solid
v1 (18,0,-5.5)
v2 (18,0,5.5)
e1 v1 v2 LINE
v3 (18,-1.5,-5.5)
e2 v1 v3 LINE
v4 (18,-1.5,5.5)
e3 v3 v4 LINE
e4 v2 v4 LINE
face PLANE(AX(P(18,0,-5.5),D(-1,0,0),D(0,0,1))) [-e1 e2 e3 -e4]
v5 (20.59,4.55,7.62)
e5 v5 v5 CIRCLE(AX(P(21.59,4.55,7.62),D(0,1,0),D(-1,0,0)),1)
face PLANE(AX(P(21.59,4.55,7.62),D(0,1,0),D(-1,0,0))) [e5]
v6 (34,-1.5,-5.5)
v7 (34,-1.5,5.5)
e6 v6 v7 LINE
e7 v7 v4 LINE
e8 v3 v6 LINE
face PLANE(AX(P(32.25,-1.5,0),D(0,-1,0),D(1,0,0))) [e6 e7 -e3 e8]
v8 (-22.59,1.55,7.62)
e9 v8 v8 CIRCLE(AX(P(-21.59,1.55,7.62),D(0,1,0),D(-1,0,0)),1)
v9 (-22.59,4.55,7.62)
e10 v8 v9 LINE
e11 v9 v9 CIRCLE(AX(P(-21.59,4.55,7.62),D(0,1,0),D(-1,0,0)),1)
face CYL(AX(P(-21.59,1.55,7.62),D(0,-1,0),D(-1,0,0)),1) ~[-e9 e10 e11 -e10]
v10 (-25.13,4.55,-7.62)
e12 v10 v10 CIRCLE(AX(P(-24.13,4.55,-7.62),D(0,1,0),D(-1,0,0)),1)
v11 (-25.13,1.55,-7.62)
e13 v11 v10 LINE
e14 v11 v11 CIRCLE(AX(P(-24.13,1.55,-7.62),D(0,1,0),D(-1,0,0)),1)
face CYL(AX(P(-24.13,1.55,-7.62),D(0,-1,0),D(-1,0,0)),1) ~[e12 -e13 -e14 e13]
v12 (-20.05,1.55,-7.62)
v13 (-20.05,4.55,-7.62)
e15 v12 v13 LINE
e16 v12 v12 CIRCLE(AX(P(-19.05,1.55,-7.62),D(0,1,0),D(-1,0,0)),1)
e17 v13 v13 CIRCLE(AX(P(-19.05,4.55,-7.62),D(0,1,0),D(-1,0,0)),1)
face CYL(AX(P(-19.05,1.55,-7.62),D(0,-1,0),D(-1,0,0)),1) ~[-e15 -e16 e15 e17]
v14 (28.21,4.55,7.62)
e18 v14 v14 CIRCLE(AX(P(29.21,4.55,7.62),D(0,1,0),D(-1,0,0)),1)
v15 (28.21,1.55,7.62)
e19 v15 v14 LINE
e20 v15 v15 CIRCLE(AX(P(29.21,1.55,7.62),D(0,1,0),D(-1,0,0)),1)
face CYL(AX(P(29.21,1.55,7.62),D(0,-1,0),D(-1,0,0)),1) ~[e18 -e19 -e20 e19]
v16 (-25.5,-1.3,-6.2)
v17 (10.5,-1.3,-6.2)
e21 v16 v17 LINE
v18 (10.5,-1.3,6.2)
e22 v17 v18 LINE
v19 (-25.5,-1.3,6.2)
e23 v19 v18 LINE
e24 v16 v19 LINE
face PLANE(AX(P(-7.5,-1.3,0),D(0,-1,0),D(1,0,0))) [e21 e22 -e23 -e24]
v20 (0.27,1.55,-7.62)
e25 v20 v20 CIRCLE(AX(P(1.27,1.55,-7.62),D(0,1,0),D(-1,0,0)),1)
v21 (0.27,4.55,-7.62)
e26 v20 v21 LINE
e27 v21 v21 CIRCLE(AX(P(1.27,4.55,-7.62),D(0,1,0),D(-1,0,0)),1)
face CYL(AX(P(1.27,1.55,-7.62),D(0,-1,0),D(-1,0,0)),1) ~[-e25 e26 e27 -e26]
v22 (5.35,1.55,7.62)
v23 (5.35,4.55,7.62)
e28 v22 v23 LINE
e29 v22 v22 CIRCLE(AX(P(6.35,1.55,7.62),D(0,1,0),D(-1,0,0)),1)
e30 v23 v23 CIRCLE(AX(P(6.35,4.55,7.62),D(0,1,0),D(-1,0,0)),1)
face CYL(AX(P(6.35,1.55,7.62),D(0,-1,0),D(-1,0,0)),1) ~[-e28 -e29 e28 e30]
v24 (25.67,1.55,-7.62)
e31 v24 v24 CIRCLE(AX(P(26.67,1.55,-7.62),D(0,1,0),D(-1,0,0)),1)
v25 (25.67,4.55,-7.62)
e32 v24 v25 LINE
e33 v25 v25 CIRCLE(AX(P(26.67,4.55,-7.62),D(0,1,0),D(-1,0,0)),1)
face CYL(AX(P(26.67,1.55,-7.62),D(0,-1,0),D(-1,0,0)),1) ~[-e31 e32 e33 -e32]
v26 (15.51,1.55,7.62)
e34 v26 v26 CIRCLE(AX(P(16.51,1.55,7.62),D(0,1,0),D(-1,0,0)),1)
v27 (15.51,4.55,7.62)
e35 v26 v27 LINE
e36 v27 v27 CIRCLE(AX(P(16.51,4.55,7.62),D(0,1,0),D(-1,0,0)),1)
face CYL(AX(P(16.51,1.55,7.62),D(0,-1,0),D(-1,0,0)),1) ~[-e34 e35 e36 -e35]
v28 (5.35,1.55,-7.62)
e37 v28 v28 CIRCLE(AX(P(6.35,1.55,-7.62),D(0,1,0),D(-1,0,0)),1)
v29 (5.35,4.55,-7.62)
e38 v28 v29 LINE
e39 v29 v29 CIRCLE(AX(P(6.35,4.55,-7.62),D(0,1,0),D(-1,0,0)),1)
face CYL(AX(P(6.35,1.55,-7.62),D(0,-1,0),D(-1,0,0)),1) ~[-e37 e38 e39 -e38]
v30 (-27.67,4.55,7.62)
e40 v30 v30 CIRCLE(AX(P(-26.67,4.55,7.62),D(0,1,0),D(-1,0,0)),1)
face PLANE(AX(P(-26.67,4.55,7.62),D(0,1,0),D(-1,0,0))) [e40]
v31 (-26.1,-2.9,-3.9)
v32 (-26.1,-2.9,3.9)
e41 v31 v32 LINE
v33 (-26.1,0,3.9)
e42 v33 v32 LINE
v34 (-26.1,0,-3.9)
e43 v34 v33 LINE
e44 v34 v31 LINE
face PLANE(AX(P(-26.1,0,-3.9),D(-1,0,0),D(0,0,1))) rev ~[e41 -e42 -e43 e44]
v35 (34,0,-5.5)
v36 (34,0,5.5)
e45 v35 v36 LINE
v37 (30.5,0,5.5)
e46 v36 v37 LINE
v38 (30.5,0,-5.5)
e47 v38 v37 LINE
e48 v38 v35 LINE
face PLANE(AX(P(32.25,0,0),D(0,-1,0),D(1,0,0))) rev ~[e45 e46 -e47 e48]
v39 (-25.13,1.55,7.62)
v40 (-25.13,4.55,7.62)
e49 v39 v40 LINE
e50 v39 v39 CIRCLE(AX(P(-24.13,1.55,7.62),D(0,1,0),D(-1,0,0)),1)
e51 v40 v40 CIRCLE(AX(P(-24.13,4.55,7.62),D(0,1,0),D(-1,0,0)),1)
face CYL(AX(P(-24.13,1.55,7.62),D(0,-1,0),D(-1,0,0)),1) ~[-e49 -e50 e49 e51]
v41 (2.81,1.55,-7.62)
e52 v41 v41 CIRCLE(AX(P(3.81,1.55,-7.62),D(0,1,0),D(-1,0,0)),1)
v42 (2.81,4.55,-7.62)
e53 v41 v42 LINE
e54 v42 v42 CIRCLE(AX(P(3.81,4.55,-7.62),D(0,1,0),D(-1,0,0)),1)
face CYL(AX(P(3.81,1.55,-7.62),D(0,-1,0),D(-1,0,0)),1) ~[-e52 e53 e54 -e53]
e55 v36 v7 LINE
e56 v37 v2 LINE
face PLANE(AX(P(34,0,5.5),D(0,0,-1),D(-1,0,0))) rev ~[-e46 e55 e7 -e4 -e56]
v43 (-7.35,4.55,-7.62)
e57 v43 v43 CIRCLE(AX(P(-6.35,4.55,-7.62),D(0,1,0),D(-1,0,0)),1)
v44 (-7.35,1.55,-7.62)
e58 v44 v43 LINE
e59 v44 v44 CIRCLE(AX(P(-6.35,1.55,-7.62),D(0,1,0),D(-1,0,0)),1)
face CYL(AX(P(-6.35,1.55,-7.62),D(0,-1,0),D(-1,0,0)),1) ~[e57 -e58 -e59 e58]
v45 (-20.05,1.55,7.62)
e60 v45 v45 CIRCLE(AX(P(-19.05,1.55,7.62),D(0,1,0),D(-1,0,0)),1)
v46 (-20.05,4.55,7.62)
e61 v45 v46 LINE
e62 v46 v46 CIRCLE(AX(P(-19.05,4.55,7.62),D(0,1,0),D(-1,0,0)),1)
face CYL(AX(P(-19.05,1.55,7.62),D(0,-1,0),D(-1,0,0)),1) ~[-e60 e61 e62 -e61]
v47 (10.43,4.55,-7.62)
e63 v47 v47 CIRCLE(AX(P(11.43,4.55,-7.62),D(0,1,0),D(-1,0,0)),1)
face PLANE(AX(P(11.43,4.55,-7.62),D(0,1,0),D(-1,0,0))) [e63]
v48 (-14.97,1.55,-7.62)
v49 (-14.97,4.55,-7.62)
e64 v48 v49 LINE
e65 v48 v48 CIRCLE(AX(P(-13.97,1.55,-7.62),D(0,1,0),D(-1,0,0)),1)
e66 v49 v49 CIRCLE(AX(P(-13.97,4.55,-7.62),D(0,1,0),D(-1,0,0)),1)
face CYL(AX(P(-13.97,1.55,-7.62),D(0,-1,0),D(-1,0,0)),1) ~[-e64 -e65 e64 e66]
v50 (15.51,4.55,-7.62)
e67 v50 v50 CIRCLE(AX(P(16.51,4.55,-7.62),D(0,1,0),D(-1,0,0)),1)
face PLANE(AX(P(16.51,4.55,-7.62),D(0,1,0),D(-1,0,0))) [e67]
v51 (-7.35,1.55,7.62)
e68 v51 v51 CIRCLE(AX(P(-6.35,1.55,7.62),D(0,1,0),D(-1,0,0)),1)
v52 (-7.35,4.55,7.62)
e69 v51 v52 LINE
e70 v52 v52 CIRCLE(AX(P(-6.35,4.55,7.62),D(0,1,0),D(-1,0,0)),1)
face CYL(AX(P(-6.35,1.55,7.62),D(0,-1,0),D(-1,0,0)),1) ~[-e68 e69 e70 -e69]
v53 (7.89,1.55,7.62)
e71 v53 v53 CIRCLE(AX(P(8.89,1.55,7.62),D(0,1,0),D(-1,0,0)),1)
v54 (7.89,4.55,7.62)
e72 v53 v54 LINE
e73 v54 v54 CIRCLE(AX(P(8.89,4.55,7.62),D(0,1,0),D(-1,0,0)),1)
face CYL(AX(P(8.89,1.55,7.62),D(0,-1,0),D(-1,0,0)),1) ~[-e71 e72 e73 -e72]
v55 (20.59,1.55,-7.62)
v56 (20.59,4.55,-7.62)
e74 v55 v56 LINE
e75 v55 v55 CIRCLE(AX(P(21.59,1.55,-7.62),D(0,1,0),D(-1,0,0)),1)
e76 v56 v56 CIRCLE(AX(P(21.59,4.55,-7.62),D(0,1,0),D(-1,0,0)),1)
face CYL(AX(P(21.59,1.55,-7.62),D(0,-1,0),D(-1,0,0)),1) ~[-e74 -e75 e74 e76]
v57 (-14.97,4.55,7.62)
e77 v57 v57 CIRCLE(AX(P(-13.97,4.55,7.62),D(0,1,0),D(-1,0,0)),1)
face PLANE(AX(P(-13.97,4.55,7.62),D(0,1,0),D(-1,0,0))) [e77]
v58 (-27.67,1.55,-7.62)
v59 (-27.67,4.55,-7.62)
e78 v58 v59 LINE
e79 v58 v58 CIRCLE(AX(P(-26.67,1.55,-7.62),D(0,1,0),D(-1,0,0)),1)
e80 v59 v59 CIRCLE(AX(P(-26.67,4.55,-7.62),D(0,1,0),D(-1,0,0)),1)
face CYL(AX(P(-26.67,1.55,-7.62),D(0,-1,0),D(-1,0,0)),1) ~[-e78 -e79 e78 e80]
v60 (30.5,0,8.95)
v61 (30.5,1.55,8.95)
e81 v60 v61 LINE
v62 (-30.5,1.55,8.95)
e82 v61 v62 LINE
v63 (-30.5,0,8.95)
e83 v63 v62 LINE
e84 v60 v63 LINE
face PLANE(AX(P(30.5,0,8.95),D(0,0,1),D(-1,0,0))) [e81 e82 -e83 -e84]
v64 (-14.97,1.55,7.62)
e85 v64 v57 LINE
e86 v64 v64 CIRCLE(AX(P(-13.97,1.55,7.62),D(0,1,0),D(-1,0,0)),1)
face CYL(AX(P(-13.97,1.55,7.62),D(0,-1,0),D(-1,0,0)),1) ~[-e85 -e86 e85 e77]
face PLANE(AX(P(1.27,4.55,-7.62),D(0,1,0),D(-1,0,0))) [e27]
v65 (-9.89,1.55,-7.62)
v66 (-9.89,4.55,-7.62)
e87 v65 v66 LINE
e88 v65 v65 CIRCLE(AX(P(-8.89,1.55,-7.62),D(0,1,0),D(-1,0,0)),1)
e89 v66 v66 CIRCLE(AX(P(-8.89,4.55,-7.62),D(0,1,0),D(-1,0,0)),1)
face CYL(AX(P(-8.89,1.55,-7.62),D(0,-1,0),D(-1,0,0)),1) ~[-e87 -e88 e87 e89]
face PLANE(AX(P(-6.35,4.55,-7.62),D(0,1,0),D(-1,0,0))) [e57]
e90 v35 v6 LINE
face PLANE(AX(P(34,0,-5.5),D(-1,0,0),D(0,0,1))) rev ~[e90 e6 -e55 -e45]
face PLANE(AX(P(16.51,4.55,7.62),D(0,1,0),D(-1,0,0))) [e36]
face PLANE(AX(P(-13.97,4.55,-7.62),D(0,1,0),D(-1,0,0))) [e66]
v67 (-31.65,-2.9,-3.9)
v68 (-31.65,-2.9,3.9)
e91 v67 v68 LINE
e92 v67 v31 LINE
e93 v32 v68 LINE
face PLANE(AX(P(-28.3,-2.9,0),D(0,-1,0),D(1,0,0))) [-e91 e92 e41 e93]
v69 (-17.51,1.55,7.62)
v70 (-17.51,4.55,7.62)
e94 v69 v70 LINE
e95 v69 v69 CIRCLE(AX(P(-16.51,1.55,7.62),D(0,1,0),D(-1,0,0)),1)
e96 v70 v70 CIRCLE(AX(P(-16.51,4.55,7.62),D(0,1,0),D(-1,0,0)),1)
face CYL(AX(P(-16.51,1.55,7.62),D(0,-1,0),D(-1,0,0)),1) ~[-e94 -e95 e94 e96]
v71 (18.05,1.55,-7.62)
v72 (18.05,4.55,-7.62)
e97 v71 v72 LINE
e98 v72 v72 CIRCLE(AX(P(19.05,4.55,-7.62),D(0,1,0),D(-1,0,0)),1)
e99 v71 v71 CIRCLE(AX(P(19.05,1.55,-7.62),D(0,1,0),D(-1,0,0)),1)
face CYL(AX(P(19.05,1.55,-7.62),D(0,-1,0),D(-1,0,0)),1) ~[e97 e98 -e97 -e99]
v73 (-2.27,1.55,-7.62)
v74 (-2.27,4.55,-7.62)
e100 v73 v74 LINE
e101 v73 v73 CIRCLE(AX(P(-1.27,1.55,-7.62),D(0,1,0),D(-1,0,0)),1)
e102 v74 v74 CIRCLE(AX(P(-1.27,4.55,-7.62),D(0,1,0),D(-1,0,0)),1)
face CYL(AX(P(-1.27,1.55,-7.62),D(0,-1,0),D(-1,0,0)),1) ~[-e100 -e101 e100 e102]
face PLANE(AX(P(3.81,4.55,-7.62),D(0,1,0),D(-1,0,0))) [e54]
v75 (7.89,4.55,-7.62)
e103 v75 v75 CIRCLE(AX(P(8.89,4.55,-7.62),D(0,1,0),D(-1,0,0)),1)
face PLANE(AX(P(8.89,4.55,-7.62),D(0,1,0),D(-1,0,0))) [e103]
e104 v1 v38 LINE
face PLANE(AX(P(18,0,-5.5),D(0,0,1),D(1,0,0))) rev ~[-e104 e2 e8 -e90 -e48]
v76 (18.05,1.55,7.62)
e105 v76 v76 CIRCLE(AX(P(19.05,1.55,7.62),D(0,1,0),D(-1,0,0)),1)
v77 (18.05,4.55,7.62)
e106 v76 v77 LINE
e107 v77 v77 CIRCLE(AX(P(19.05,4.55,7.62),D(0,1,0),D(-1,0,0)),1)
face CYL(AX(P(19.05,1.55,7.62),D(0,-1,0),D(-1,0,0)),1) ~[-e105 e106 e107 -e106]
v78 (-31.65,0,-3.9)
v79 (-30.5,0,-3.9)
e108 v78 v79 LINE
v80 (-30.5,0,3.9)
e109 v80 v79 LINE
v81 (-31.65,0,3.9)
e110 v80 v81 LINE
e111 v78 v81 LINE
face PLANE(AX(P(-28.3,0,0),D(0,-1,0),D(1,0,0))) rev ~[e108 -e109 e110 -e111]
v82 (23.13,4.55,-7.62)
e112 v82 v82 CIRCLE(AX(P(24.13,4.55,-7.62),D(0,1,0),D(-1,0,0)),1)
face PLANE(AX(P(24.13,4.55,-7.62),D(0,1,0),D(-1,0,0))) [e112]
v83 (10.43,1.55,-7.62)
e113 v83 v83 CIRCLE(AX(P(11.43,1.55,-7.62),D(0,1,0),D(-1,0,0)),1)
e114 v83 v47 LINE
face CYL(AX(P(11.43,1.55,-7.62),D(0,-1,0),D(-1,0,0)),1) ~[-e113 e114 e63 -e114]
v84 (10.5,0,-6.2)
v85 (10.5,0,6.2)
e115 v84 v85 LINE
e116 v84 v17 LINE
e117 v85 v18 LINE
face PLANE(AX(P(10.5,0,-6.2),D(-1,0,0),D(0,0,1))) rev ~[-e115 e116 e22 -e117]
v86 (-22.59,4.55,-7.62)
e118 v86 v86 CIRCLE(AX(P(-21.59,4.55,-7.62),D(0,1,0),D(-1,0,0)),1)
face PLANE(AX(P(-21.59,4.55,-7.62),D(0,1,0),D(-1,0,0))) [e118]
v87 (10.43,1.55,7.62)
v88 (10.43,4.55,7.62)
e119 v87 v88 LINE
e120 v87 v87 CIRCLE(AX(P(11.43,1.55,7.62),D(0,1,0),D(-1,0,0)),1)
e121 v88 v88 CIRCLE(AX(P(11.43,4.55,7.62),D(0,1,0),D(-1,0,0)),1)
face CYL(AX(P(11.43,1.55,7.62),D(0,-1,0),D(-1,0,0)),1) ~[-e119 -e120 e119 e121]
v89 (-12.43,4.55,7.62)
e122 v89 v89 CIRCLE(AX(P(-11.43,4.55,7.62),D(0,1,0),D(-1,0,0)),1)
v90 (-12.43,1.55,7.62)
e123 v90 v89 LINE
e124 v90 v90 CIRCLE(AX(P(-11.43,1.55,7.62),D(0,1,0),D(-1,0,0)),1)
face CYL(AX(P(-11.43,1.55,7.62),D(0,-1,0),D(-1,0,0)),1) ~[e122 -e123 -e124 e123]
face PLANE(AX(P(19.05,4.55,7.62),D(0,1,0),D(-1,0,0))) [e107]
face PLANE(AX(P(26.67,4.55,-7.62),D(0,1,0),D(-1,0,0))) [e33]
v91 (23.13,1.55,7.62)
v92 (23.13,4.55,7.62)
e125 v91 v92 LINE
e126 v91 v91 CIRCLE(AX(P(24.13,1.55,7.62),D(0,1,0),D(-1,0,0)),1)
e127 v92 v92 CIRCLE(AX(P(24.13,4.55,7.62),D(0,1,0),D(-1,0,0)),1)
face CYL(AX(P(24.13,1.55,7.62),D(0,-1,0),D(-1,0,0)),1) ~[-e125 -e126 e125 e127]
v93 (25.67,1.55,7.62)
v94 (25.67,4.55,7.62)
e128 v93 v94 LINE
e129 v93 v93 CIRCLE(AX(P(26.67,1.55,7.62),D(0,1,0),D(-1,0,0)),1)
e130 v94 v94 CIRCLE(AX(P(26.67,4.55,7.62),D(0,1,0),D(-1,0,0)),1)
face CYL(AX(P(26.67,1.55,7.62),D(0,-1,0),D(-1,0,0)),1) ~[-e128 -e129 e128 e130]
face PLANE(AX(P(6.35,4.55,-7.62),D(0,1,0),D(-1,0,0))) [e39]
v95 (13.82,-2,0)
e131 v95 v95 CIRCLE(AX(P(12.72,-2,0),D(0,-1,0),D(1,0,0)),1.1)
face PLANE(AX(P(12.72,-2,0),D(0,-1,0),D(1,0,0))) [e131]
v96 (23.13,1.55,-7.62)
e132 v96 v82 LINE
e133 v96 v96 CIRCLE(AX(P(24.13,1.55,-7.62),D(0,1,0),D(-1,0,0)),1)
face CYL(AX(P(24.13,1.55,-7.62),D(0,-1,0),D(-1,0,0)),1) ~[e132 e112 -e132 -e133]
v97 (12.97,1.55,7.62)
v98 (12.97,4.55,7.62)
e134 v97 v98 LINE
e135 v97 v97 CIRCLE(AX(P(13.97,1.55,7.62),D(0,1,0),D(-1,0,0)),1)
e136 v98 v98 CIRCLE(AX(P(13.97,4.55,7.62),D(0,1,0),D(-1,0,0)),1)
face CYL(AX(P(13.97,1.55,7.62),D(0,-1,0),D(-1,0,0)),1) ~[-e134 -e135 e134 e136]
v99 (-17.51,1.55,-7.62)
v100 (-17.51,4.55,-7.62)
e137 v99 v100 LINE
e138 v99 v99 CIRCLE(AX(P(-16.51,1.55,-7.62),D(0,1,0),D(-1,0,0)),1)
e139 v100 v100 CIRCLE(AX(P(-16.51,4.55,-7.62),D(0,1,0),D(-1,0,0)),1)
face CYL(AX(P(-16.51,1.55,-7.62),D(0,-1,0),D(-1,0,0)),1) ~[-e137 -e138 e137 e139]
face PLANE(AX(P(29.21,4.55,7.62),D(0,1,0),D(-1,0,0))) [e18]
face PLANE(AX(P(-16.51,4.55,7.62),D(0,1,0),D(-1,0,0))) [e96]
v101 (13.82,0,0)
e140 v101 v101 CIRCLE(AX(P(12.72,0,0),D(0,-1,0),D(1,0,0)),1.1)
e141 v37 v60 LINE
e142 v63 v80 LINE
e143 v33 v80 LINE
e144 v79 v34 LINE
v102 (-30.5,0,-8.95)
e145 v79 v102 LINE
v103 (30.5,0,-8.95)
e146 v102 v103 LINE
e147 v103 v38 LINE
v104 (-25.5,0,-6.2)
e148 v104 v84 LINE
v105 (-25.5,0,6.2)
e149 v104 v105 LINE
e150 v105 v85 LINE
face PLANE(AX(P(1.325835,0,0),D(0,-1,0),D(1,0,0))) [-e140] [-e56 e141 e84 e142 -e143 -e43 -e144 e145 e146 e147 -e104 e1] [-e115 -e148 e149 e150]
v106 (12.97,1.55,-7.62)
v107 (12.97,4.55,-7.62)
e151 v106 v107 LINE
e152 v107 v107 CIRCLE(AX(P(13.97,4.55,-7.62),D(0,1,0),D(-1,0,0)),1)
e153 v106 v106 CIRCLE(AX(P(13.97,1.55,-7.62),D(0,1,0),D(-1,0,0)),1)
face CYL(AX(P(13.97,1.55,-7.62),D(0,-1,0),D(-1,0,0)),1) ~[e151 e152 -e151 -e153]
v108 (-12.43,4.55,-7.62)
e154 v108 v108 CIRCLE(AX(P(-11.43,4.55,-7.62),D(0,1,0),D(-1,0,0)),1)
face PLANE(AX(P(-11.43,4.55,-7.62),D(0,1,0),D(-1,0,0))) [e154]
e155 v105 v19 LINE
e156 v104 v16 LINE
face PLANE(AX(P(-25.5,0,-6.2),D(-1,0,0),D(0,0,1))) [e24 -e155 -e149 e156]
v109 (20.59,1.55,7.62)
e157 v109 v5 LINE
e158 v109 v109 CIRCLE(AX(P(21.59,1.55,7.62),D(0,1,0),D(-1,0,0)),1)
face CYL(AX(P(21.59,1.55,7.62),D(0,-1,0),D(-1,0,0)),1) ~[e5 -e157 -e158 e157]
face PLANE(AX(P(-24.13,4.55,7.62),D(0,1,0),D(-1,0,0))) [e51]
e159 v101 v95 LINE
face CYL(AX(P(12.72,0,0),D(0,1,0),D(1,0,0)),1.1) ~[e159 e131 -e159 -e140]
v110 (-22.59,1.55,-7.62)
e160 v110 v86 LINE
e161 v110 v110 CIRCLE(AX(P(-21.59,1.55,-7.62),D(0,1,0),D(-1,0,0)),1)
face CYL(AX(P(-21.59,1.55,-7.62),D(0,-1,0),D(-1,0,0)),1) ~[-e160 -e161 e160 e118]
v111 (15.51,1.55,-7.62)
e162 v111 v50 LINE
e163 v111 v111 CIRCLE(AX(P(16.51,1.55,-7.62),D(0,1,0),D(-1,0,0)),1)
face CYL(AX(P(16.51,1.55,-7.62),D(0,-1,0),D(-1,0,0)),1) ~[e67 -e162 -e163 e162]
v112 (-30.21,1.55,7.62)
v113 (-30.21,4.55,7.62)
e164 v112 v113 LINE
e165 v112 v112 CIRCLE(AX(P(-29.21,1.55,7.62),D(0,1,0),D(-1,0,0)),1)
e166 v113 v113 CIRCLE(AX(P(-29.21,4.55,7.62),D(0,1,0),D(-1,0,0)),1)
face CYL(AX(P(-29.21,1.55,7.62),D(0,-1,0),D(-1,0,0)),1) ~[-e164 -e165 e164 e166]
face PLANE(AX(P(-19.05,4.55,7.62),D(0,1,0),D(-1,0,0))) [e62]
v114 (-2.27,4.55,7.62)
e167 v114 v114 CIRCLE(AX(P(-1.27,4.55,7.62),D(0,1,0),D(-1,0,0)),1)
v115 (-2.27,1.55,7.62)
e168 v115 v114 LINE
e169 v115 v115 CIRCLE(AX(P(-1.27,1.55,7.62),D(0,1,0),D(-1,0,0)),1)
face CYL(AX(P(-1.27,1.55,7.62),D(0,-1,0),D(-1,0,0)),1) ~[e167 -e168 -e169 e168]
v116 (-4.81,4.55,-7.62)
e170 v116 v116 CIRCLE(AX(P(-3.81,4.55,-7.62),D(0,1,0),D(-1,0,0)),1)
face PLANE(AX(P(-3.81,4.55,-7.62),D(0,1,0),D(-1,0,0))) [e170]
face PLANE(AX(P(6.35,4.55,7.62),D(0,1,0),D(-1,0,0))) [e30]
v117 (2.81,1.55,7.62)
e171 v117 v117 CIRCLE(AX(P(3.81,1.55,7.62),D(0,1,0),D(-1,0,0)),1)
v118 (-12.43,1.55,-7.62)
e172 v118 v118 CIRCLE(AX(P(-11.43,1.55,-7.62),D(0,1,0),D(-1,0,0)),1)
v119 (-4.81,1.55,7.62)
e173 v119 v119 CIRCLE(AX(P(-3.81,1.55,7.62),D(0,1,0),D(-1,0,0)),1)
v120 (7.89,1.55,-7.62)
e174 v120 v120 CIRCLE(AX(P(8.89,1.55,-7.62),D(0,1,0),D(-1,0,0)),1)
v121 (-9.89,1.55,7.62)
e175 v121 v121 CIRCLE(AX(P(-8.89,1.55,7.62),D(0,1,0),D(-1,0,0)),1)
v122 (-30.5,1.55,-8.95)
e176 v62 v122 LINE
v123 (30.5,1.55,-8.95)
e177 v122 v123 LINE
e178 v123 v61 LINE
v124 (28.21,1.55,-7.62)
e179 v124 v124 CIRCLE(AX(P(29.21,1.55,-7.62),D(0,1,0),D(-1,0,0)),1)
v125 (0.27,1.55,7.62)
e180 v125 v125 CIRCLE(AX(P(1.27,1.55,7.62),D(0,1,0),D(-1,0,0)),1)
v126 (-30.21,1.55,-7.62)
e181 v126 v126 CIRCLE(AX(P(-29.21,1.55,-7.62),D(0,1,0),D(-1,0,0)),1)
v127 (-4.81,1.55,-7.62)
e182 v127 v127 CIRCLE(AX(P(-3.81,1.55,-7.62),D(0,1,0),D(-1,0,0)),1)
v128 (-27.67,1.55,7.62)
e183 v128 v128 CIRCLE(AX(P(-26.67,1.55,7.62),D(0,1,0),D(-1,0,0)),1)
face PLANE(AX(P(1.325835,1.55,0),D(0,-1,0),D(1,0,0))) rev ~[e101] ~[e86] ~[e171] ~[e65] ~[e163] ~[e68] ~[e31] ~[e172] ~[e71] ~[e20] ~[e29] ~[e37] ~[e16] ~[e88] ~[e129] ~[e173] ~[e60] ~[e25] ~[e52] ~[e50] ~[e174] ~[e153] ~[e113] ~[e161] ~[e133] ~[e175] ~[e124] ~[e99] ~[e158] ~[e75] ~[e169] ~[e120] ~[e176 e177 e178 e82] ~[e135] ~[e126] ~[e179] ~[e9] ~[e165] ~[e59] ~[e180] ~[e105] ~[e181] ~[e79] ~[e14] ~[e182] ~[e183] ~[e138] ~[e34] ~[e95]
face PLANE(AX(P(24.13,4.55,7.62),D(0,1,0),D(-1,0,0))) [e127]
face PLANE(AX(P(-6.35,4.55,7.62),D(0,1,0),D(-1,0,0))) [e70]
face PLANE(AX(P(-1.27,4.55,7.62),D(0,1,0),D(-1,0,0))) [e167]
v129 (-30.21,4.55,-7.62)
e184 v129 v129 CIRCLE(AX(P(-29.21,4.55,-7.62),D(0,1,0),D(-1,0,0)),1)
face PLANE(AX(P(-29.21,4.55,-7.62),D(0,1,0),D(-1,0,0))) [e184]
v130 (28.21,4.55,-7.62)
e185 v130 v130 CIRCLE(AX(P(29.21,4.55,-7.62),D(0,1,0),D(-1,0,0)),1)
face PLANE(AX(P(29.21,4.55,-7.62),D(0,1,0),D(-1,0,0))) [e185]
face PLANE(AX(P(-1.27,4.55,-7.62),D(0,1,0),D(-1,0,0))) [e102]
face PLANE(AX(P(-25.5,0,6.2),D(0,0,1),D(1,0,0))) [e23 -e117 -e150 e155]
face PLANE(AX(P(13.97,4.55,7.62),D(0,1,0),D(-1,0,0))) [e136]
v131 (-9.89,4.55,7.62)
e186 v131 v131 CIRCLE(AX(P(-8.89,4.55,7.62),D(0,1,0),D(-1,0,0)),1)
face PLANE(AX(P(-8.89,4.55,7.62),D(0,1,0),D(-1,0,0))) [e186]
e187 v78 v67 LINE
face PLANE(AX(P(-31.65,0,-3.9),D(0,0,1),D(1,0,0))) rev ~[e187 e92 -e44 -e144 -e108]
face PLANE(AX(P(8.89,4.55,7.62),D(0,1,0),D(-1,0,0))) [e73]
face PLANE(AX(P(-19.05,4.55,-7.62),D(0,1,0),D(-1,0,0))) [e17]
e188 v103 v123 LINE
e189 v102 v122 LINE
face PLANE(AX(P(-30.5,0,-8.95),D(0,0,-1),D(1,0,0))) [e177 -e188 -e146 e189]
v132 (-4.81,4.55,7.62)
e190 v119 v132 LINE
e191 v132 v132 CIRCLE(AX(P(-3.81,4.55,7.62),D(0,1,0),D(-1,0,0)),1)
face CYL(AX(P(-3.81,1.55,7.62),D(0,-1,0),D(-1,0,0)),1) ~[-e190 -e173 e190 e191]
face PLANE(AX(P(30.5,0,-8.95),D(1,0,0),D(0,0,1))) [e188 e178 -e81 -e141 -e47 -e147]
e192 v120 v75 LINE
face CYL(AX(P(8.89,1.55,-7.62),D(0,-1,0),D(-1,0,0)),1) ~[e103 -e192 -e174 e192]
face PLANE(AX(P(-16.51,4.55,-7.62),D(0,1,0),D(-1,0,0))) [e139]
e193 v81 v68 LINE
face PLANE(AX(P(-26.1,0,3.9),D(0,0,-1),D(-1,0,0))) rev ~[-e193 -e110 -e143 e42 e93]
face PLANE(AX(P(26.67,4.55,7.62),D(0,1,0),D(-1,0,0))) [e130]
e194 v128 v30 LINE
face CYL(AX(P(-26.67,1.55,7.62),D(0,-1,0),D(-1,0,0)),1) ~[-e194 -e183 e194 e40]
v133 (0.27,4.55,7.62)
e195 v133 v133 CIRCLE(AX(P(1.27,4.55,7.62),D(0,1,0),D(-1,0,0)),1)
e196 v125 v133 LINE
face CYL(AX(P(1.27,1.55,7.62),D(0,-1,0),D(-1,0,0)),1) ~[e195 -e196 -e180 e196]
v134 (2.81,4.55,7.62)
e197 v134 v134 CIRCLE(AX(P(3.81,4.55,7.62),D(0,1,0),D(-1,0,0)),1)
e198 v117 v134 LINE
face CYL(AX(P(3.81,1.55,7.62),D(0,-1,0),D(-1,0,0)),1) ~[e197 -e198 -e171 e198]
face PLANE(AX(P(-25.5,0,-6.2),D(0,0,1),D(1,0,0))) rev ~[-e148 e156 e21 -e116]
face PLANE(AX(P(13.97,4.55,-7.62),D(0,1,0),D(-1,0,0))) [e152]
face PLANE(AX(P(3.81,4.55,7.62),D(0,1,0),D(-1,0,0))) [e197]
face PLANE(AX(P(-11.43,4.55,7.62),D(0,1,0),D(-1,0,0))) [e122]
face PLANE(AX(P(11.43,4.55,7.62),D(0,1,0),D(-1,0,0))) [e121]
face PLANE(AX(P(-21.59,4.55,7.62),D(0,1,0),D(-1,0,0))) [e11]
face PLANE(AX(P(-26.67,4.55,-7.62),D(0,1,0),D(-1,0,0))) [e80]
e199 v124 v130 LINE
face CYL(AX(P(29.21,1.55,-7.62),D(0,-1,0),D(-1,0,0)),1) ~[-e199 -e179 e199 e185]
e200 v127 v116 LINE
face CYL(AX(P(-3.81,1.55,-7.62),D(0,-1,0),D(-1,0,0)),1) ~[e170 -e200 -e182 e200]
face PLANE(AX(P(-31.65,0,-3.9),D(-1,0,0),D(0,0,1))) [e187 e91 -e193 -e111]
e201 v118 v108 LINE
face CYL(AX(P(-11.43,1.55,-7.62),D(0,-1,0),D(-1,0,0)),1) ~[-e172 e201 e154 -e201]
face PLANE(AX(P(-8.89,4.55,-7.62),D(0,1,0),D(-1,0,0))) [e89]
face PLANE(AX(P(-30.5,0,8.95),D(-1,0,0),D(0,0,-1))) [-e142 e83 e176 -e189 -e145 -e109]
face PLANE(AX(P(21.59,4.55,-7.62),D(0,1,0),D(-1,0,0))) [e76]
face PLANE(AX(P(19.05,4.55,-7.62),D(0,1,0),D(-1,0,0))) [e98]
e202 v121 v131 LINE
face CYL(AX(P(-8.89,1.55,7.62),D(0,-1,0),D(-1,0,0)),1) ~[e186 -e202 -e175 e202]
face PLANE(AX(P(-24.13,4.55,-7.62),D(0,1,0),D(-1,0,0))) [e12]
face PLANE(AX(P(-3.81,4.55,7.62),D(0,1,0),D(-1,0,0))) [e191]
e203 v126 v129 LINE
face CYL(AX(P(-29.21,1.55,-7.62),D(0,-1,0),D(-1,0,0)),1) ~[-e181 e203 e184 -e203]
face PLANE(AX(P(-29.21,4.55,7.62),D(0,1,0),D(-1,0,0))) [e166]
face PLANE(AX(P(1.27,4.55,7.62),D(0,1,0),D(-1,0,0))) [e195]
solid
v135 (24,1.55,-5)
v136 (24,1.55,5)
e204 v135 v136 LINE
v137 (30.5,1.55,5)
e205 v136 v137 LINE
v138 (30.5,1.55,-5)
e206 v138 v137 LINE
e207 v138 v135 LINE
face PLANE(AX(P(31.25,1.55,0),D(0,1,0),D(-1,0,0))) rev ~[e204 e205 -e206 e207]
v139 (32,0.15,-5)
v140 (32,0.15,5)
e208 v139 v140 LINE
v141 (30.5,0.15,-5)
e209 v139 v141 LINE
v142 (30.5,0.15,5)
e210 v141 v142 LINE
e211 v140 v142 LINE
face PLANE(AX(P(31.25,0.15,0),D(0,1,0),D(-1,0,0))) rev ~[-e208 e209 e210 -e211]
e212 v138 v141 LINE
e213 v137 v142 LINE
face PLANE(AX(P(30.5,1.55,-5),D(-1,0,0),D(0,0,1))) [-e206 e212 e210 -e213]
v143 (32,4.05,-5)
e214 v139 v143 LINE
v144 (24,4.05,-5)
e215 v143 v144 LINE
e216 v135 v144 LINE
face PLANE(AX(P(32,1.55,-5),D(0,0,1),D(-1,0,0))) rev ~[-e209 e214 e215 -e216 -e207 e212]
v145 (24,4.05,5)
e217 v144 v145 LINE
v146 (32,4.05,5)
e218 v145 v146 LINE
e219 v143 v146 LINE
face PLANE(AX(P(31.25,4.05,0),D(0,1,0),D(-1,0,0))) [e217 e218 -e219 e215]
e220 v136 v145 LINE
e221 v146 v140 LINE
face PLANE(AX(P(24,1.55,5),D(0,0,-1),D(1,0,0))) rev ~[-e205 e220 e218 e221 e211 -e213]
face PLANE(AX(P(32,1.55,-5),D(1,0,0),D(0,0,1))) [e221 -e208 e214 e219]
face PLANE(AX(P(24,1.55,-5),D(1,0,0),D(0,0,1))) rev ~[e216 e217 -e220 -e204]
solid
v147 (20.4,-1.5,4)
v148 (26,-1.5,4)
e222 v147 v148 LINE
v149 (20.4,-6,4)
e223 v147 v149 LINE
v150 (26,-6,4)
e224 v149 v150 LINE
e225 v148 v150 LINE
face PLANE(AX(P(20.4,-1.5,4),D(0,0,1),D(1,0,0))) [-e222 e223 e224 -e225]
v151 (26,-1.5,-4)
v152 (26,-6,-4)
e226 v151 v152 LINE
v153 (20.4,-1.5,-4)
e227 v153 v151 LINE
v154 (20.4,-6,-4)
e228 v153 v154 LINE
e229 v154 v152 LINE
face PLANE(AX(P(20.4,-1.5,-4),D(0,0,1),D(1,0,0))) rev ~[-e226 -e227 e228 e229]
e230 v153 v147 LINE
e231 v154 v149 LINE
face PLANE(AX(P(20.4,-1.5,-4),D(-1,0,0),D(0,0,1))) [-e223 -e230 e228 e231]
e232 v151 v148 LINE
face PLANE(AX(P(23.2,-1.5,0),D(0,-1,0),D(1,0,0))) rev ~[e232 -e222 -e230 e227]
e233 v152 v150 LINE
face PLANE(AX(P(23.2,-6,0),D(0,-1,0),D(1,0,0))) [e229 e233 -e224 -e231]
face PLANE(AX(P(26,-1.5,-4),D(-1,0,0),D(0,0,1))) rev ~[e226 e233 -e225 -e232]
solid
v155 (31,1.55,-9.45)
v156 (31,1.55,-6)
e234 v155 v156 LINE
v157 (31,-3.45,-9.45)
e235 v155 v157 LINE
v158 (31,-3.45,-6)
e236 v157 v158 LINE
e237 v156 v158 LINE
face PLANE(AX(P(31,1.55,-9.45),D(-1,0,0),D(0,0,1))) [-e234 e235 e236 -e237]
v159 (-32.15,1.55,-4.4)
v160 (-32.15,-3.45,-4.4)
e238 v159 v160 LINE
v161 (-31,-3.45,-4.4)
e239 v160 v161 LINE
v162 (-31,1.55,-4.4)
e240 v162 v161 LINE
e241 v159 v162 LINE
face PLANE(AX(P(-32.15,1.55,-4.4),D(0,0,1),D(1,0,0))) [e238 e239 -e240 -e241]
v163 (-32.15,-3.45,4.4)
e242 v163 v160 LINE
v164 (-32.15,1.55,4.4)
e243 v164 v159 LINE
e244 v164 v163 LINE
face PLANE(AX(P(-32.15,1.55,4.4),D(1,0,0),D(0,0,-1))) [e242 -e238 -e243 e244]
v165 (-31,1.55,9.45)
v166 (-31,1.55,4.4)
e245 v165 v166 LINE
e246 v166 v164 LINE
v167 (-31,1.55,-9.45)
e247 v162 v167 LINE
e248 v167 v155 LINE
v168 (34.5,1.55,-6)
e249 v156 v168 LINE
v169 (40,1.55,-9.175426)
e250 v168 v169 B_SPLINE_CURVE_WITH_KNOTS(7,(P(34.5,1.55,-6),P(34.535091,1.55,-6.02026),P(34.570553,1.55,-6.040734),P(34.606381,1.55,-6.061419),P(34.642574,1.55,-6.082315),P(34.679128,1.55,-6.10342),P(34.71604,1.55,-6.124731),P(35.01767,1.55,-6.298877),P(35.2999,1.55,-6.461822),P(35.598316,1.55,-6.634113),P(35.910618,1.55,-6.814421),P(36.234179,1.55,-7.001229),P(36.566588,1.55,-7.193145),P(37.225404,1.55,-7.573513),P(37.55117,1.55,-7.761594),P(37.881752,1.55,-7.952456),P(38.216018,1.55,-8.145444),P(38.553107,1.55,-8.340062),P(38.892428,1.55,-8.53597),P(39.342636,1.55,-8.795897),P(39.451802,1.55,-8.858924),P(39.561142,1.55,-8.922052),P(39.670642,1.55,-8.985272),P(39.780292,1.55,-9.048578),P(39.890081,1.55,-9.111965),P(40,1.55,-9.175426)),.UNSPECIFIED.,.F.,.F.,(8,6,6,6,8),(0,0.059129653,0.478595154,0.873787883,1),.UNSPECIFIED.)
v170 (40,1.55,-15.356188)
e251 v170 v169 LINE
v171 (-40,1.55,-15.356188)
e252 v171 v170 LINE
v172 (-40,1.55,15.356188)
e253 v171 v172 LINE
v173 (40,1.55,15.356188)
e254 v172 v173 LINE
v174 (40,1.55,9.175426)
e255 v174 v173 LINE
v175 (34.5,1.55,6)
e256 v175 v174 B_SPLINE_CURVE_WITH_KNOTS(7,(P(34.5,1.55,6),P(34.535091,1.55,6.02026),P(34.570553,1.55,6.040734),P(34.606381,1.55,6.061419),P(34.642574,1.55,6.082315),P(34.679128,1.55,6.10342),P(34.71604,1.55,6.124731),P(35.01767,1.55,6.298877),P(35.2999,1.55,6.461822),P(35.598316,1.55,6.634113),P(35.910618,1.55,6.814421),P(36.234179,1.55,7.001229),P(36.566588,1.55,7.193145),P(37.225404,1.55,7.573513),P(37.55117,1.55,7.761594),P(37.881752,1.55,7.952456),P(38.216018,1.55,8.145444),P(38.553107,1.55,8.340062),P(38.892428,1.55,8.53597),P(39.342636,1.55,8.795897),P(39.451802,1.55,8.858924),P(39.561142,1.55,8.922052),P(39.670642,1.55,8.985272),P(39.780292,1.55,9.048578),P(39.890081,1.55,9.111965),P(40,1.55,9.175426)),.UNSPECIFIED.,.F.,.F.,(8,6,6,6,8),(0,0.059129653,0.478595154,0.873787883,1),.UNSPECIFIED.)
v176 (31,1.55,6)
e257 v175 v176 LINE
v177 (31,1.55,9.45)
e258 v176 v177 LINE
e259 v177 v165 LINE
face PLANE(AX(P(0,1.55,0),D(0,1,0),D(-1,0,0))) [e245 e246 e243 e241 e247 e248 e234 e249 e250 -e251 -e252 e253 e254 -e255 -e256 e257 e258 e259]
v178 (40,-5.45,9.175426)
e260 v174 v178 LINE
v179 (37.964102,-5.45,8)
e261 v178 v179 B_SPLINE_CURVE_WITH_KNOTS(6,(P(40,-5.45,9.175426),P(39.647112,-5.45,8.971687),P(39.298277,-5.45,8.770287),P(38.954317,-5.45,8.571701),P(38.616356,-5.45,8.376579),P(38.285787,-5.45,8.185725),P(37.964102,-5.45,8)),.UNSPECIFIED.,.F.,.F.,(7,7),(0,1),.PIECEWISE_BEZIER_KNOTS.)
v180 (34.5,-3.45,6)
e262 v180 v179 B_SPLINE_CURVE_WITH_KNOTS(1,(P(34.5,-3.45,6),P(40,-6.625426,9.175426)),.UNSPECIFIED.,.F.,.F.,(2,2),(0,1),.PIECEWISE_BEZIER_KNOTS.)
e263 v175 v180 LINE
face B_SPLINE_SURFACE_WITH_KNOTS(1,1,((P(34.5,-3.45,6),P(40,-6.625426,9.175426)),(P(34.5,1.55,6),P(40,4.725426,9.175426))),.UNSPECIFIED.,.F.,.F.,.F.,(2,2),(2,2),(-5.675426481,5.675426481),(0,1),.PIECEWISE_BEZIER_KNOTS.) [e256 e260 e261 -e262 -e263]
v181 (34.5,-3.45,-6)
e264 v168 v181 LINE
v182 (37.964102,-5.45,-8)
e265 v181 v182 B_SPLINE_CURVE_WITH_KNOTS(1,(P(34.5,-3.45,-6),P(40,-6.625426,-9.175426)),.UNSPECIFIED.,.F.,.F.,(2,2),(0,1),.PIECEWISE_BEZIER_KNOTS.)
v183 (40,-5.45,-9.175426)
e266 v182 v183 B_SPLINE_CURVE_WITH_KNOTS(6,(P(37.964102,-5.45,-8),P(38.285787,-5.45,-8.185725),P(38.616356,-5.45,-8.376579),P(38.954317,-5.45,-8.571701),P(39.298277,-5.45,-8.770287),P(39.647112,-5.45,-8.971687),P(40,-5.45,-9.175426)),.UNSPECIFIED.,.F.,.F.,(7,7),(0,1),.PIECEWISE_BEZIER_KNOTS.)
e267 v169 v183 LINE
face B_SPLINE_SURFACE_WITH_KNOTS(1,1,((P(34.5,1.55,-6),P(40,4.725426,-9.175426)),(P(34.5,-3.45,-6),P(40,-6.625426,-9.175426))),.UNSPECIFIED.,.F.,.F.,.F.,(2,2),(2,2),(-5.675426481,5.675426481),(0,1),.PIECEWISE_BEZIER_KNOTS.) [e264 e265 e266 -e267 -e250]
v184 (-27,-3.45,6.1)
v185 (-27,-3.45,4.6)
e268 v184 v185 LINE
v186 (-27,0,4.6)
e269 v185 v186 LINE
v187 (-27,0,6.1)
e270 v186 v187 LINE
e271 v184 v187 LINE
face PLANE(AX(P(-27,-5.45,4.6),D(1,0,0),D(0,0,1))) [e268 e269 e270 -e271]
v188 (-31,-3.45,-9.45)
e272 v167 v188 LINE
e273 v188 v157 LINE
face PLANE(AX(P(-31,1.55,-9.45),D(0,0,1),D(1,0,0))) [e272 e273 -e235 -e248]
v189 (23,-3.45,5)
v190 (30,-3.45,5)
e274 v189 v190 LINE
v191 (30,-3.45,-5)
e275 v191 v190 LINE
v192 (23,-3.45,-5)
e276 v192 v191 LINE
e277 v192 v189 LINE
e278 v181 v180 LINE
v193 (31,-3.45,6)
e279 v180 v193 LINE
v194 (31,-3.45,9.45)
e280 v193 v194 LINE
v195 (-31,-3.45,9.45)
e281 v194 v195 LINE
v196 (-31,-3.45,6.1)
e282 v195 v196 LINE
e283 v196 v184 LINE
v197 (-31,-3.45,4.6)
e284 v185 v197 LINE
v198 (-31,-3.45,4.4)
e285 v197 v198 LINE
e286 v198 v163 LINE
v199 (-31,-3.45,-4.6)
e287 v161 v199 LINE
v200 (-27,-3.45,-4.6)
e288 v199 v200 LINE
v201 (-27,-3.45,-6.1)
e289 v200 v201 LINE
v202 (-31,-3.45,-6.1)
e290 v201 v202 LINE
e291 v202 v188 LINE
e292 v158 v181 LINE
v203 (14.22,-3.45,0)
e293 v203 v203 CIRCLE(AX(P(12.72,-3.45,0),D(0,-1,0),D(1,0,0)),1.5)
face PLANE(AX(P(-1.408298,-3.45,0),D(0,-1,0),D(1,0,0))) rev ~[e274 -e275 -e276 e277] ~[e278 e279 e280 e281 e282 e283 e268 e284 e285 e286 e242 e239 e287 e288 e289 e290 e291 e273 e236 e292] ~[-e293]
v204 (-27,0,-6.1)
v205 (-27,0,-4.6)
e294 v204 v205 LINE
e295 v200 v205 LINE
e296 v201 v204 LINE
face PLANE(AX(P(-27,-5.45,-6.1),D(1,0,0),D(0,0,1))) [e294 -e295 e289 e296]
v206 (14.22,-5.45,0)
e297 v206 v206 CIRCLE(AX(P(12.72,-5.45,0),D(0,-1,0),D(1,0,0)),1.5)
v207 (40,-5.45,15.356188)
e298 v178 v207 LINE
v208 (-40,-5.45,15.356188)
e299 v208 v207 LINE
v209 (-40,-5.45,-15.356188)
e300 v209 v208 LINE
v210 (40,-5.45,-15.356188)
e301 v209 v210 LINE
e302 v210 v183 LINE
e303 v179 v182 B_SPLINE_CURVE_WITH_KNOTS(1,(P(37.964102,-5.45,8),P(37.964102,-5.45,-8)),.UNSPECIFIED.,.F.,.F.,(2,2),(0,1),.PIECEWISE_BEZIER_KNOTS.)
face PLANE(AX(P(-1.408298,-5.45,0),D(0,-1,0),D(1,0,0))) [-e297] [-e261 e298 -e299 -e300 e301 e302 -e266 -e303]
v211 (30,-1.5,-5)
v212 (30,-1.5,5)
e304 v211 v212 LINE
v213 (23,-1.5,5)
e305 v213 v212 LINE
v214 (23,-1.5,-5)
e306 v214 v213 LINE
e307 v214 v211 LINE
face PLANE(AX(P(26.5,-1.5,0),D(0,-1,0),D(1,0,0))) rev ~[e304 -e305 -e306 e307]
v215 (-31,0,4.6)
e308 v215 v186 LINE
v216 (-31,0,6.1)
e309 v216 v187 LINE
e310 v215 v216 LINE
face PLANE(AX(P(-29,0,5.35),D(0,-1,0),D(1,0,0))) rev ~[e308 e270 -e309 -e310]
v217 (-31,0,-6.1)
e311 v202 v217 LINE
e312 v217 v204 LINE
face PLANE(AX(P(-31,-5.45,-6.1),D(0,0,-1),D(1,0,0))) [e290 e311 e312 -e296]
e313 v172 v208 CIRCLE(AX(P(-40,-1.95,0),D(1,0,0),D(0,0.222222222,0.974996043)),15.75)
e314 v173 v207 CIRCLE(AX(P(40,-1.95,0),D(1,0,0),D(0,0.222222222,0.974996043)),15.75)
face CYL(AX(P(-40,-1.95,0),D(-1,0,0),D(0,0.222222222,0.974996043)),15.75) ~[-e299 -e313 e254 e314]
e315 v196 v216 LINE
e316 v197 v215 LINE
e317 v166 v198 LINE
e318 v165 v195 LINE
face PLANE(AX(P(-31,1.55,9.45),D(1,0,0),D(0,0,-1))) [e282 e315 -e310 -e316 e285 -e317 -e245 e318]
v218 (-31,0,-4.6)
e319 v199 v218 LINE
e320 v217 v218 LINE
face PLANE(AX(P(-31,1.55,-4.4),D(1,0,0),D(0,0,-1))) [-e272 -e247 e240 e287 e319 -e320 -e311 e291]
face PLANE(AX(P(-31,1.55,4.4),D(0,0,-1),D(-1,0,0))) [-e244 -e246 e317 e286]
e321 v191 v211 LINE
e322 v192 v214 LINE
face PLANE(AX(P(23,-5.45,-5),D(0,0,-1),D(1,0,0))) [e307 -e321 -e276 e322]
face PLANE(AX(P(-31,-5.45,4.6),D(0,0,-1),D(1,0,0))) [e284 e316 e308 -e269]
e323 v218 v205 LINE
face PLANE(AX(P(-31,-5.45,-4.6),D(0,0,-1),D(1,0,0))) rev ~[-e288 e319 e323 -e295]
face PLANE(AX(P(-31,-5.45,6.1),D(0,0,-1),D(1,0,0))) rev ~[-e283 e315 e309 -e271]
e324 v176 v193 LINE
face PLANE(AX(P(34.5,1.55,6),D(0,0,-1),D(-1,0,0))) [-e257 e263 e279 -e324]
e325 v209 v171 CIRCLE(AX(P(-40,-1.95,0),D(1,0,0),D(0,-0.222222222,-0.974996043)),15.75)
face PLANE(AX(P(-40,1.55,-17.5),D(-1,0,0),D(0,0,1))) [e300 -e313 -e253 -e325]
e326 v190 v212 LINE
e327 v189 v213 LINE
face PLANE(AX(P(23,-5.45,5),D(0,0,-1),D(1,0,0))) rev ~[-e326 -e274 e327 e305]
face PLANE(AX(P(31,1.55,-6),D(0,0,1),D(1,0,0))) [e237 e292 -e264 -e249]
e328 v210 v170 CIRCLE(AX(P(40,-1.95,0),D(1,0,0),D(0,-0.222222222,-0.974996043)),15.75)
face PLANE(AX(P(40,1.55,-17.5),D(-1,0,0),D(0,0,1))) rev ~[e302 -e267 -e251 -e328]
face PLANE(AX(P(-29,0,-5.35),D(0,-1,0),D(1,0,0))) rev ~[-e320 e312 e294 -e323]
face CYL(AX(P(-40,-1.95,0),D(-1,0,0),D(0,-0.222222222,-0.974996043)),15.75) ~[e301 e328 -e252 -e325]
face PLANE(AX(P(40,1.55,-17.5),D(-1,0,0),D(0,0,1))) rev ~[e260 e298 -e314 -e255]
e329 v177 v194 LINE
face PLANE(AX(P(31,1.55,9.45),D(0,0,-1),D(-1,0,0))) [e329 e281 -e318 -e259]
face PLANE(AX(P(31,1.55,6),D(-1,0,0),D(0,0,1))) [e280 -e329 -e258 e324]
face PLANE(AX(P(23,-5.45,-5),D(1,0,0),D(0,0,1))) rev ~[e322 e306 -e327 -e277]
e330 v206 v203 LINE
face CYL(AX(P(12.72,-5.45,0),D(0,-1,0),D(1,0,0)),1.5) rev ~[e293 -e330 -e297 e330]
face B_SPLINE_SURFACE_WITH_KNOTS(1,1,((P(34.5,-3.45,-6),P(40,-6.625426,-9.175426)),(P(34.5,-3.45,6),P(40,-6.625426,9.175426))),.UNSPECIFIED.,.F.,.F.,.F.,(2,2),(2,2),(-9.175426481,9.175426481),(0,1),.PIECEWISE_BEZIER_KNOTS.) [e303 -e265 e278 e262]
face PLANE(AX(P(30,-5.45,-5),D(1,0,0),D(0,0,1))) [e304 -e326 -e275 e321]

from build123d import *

# Parameters (mm, degrees)
F0_W      = 36
F0_H      = 12.4
F0_R      = 1.1
F0_W_2    = 4.4
F0_H_2    = 7.8
F0_W_3    = 12.5
F0_H_3    = 11
F1_DEPTH  = 1.55
F2_DEPTH  = 2
F0_W_4    = 1.15
F3_DEPTH  = 2.9
F0_W_5    = 3.5
F4_DEPTH  = 1.5
F5_DEPTH  = 1.3
F6_R      = 1
F7_DEPTH  = 3
F8_W      = 5.6
F8_H      = 8
F10_DEPTH = 4.5
F9_W      = 1.5
F9_H      = 10
F11_DEPTH = 1.4
F9_W_2    = 6.5
F12_DEPTH = 2.5
F13_W     = 80
F13_H     = 35
F14_DEPTH = 7
F15_W     = 7
F15_H     = 10
F16_DEPTH = 2
F15_W_2   = 4
F15_H_2   = 1.5
F17_DEPTH = 5.45
F18_DEPTH = 3.95
F19_R     = 1.5
F20_DEPTH = 2
F21_W     = 5
F21_H     = 12
F22_DEPTH = 5.5
F22_TAPER = -30
F24_DEPTH = 80


with BuildPart() as f1:
    # F0 (on Front) → F1 (new body)
    with BuildSketch(Plane.XZ):
        Polygon((-30.5, -8.95), (30.5, -8.95), (30.5, -5.5), (18, -5.5), (18, 5.5), (30.5, 5.5), (30.5, 8.95), (-30.5, 8.95), (-30.5, 3.9), (-26.1, 3.9), (-26.1, -3.9), (-30.5, -3.9), align=None)
        with Locations((-7.5, 0)):
            Rectangle(F0_W, F0_H, mode=Mode.SUBTRACT)
        with Locations((12.72, 0)):
            Circle(F0_R, mode=Mode.SUBTRACT)
        with Locations((-28.3, 0)):
            Rectangle(F0_W_2, F0_H_2)
        with Locations((24.25, 0)):
            Rectangle(F0_W_3, F0_H_3)
        with Locations((12.72, 0)):
            Circle(F0_R)
        with Locations((-7.5, 0)):
            Rectangle(F0_W, F0_H)
    extrude(amount=-F1_DEPTH)

    # F0 (on Front) → F2 (join)
    with BuildSketch(Plane.XZ):
        with Locations((12.72, 0)):
            Circle(F0_R)
    extrude(amount=F2_DEPTH)

    # F0 (on Front) → F3 (join)
    with BuildSketch(Plane.XZ):
        with Locations((-28.3, 0)):
            Rectangle(F0_W_2, F0_H_2)
        with Locations((-31.075, 0)):
            Rectangle(F0_W_4, F0_H_2)
    extrude(amount=F3_DEPTH)

    # F0 (on Front) → F4 (join)
    with BuildSketch(Plane.XZ):
        with Locations((32.25, 0)):
            Rectangle(F0_W_5, F0_H_3)
        with Locations((24.25, 0)):
            Rectangle(F0_W_3, F0_H_3)
    extrude(amount=F4_DEPTH)

    # F0 (on Front) → F5 (join)
    with BuildSketch(Plane.XZ):
        with Locations((-7.5, 0)):
            Rectangle(F0_W, F0_H)
    extrude(amount=F5_DEPTH)

    # F6 (on face) → F7 (join)
    with BuildSketch(Plane(origin=(0, 1.55, 0), x_dir=(-1, 0, 0), z_dir=(0, 1, 0))):
        with Locations((29.21, -7.62)):
            Circle(F6_R)
        with Locations((29.21, 7.62)):
            Circle(F6_R)
        with Locations((26.67, -7.62)):
            Circle(F6_R)
        with Locations((26.67, 7.62)):
            Circle(F6_R)
        with Locations((24.13, -7.62)):
            Circle(F6_R)
        with Locations((24.13, 7.62)):
            Circle(F6_R)
        with Locations((21.59, -7.62)):
            Circle(F6_R)
        with Locations((21.59, 7.62)):
            Circle(F6_R)
        with Locations((19.05, -7.62)):
            Circle(F6_R)
        with Locations((19.05, 7.62)):
            Circle(F6_R)
        with Locations((16.51, -7.62)):
            Circle(F6_R)
        with Locations((16.51, 7.62)):
            Circle(F6_R)
        with Locations((13.97, -7.62)):
            Circle(F6_R)
        with Locations((13.97, 7.62)):
            Circle(F6_R)
        with Locations((11.43, -7.62)):
            Circle(F6_R)
        with Locations((11.43, 7.62)):
            Circle(F6_R)
        with Locations((8.89, -7.62)):
            Circle(F6_R)
        with Locations((8.89, 7.62)):
            Circle(F6_R)
        with Locations((6.35, -7.62)):
            Circle(F6_R)
        with Locations((6.35, 7.62)):
            Circle(F6_R)
        with Locations((3.81, -7.62)):
            Circle(F6_R)
        with Locations((3.81, 7.62)):
            Circle(F6_R)
        with Locations((1.27, -7.62)):
            Circle(F6_R)
        with Locations((1.27, 7.62)):
            Circle(F6_R)
        with Locations((-1.27, -7.62)):
            Circle(F6_R)
        with Locations((-1.27, 7.62)):
            Circle(F6_R)
        with Locations((-3.81, -7.62)):
            Circle(F6_R)
        with Locations((-3.81, 7.62)):
            Circle(F6_R)
        with Locations((-6.35, -7.62)):
            Circle(F6_R)
        with Locations((-6.35, 7.62)):
            Circle(F6_R)
        with Locations((-8.89, -7.62)):
            Circle(F6_R)
        with Locations((-8.89, 7.62)):
            Circle(F6_R)
        with Locations((-11.43, -7.62)):
            Circle(F6_R)
        with Locations((-11.43, 7.62)):
            Circle(F6_R)
        with Locations((-13.97, -7.62)):
            Circle(F6_R)
        with Locations((-13.97, 7.62)):
            Circle(F6_R)
        with Locations((-16.51, -7.62)):
            Circle(F6_R)
        with Locations((-16.51, 7.62)):
            Circle(F6_R)
        with Locations((-19.05, -7.62)):
            Circle(F6_R)
        with Locations((-19.05, 7.62)):
            Circle(F6_R)
        with Locations((-21.59, -7.62)):
            Circle(F6_R)
        with Locations((-21.59, 7.62)):
            Circle(F6_R)
        with Locations((-24.13, -7.62)):
            Circle(F6_R)
        with Locations((-24.13, 7.62)):
            Circle(F6_R)
        with Locations((-26.67, -7.62)):
            Circle(F6_R)
        with Locations((-26.67, 7.62)):
            Circle(F6_R)
        with Locations((-29.21, -7.62)):
            Circle(F6_R)
        with Locations((-29.21, 7.62)):
            Circle(F6_R)
    extrude(amount=F7_DEPTH)


with BuildPart() as f10:
    # F8 (on face) → F10 (new body)
    with BuildSketch(Plane.XZ.offset(1.5)):
        with Locations((23.2, 0)):
            Rectangle(F8_W, F8_H)
    extrude(amount=F10_DEPTH)


with BuildPart() as f11:
    # F9 (on face) → F11 (new body)
    with BuildSketch(Plane(origin=(0, 1.55, 0), x_dir=(-1, 0, 0), z_dir=(0, 1, 0))):
        with Locations((-31.25, 0)):
            Rectangle(F9_W, F9_H)
    extrude(amount=-F11_DEPTH)

    # F9 (on face) → F12 (join)
    with BuildSketch(Plane(origin=(0, 1.55, 0), x_dir=(-1, 0, 0), z_dir=(0, 1, 0))):
        with Locations((-31.25, 0)):
            Rectangle(F9_W, F9_H)
        with Locations((-27.25, 0)):
            Rectangle(F9_W_2, F9_H)
    extrude(amount=F12_DEPTH)


with BuildPart() as f14:
    # F13 (on face) → F14 (new body)
    with BuildSketch(Plane(origin=(0, 1.55, 0), x_dir=(-1, 0, 0), z_dir=(0, 1, 0))):
        Rectangle(F13_W, F13_H)
        Polygon((-34.5, 6), (-31, 6), (-31, 9.45), (31, 9.45), (31, 4.4), (32.15, 4.4), (32.15, -4.4), (31, -4.4), (31, -9.45), (-31, -9.45), (-31, -6), (-34.5, -6), align=None, mode=Mode.SUBTRACT)
    extrude(amount=-F14_DEPTH)

    # F15 (on face) → F16 (join)
    with BuildSketch(Plane.XZ.offset(5.45)):
        Polygon((-31, 9.45), (-31, 6.1), (-27, 6.1), (-27, 4.6), (-31, 4.6), (-31, 4.4), (-32.15, 4.4), (-32.15, -4.4), (-31, -4.4), (-31, -4.6), (-27, -4.6), (-27, -6.1), (-31, -6.1), (-31, -9.45), (31, -9.45), (31, -6), (34.5, -6), (34.5, 6), (31, 6), (31, 9.45), align=None)
        with Locations((26.5, 0)):
            Rectangle(F15_W, F15_H, mode=Mode.SUBTRACT)
    extrude(amount=-F16_DEPTH)

    # F15 (on face) → F17 (join, through all)
    with BuildSketch(Plane.XZ.offset(5.45)):
        with Locations((-29, 5.35)):
            Rectangle(F15_W_2, F15_H_2)
        with Locations((-29, -5.35)):
            Rectangle(F15_W_2, F15_H_2)
    extrude(amount=-F17_DEPTH)

    # F15 (on face) → F18 (join, through all)
    with BuildSketch(Plane.XZ.offset(5.45)):
        with Locations((26.5, 0)):
            Rectangle(F15_W, F15_H)
    extrude(amount=-F18_DEPTH)

    # F19 (on face) → F20 (cut, through all)
    with BuildSketch(Plane.XZ.offset(5.45)):
        with Locations((12.72, 0)):
            Circle(F19_R)
    extrude(amount=-F20_DEPTH, mode=Mode.SUBTRACT)

    # F21 (on face) → F22 (cut, through all)
    with BuildSketch(Plane(origin=(34.5, 0, 0), x_dir=(0, -1, 0), z_dir=(-1, 0, 0))):
        with Locations((0.95, 0)):
            Rectangle(F21_W, F21_H)
    extrude(amount=-F22_DEPTH, taper=F22_TAPER, mode=Mode.SUBTRACT)

    # F23 (on face) → F24 (cut)
    with BuildSketch(Plane(origin=(-40, 0, 0), x_dir=(0, -1, 0), z_dir=(-1, 0, 0))):
        with BuildLine():
            ThreePointArc((5.45, -15.3561876779), (1.95, -15.75), (-1.55, -15.3561876779))
            Line((-1.55, -15.3561876779), (-1.55, -17.5))
            Line((-1.55, -17.5), (5.45, -17.5))
            Line((5.45, -17.5), (5.45, -15.3561876779))
        make_face()
        with BuildLine():
            Line((5.45, 17.5), (-1.55, 17.5))
            Line((-1.55, 17.5), (-1.55, 15.3561876779))
            ThreePointArc((-1.55, 15.3561876779), (1.95, 15.75), (5.45, 15.3561876779))
            Line((5.45, 15.3561876779), (5.45, 17.5))
        make_face()
    extrude(amount=-F24_DEPTH, mode=Mode.SUBTRACT)


solid = Compound([f1.part, f10.part, f11.part, f14.part])
